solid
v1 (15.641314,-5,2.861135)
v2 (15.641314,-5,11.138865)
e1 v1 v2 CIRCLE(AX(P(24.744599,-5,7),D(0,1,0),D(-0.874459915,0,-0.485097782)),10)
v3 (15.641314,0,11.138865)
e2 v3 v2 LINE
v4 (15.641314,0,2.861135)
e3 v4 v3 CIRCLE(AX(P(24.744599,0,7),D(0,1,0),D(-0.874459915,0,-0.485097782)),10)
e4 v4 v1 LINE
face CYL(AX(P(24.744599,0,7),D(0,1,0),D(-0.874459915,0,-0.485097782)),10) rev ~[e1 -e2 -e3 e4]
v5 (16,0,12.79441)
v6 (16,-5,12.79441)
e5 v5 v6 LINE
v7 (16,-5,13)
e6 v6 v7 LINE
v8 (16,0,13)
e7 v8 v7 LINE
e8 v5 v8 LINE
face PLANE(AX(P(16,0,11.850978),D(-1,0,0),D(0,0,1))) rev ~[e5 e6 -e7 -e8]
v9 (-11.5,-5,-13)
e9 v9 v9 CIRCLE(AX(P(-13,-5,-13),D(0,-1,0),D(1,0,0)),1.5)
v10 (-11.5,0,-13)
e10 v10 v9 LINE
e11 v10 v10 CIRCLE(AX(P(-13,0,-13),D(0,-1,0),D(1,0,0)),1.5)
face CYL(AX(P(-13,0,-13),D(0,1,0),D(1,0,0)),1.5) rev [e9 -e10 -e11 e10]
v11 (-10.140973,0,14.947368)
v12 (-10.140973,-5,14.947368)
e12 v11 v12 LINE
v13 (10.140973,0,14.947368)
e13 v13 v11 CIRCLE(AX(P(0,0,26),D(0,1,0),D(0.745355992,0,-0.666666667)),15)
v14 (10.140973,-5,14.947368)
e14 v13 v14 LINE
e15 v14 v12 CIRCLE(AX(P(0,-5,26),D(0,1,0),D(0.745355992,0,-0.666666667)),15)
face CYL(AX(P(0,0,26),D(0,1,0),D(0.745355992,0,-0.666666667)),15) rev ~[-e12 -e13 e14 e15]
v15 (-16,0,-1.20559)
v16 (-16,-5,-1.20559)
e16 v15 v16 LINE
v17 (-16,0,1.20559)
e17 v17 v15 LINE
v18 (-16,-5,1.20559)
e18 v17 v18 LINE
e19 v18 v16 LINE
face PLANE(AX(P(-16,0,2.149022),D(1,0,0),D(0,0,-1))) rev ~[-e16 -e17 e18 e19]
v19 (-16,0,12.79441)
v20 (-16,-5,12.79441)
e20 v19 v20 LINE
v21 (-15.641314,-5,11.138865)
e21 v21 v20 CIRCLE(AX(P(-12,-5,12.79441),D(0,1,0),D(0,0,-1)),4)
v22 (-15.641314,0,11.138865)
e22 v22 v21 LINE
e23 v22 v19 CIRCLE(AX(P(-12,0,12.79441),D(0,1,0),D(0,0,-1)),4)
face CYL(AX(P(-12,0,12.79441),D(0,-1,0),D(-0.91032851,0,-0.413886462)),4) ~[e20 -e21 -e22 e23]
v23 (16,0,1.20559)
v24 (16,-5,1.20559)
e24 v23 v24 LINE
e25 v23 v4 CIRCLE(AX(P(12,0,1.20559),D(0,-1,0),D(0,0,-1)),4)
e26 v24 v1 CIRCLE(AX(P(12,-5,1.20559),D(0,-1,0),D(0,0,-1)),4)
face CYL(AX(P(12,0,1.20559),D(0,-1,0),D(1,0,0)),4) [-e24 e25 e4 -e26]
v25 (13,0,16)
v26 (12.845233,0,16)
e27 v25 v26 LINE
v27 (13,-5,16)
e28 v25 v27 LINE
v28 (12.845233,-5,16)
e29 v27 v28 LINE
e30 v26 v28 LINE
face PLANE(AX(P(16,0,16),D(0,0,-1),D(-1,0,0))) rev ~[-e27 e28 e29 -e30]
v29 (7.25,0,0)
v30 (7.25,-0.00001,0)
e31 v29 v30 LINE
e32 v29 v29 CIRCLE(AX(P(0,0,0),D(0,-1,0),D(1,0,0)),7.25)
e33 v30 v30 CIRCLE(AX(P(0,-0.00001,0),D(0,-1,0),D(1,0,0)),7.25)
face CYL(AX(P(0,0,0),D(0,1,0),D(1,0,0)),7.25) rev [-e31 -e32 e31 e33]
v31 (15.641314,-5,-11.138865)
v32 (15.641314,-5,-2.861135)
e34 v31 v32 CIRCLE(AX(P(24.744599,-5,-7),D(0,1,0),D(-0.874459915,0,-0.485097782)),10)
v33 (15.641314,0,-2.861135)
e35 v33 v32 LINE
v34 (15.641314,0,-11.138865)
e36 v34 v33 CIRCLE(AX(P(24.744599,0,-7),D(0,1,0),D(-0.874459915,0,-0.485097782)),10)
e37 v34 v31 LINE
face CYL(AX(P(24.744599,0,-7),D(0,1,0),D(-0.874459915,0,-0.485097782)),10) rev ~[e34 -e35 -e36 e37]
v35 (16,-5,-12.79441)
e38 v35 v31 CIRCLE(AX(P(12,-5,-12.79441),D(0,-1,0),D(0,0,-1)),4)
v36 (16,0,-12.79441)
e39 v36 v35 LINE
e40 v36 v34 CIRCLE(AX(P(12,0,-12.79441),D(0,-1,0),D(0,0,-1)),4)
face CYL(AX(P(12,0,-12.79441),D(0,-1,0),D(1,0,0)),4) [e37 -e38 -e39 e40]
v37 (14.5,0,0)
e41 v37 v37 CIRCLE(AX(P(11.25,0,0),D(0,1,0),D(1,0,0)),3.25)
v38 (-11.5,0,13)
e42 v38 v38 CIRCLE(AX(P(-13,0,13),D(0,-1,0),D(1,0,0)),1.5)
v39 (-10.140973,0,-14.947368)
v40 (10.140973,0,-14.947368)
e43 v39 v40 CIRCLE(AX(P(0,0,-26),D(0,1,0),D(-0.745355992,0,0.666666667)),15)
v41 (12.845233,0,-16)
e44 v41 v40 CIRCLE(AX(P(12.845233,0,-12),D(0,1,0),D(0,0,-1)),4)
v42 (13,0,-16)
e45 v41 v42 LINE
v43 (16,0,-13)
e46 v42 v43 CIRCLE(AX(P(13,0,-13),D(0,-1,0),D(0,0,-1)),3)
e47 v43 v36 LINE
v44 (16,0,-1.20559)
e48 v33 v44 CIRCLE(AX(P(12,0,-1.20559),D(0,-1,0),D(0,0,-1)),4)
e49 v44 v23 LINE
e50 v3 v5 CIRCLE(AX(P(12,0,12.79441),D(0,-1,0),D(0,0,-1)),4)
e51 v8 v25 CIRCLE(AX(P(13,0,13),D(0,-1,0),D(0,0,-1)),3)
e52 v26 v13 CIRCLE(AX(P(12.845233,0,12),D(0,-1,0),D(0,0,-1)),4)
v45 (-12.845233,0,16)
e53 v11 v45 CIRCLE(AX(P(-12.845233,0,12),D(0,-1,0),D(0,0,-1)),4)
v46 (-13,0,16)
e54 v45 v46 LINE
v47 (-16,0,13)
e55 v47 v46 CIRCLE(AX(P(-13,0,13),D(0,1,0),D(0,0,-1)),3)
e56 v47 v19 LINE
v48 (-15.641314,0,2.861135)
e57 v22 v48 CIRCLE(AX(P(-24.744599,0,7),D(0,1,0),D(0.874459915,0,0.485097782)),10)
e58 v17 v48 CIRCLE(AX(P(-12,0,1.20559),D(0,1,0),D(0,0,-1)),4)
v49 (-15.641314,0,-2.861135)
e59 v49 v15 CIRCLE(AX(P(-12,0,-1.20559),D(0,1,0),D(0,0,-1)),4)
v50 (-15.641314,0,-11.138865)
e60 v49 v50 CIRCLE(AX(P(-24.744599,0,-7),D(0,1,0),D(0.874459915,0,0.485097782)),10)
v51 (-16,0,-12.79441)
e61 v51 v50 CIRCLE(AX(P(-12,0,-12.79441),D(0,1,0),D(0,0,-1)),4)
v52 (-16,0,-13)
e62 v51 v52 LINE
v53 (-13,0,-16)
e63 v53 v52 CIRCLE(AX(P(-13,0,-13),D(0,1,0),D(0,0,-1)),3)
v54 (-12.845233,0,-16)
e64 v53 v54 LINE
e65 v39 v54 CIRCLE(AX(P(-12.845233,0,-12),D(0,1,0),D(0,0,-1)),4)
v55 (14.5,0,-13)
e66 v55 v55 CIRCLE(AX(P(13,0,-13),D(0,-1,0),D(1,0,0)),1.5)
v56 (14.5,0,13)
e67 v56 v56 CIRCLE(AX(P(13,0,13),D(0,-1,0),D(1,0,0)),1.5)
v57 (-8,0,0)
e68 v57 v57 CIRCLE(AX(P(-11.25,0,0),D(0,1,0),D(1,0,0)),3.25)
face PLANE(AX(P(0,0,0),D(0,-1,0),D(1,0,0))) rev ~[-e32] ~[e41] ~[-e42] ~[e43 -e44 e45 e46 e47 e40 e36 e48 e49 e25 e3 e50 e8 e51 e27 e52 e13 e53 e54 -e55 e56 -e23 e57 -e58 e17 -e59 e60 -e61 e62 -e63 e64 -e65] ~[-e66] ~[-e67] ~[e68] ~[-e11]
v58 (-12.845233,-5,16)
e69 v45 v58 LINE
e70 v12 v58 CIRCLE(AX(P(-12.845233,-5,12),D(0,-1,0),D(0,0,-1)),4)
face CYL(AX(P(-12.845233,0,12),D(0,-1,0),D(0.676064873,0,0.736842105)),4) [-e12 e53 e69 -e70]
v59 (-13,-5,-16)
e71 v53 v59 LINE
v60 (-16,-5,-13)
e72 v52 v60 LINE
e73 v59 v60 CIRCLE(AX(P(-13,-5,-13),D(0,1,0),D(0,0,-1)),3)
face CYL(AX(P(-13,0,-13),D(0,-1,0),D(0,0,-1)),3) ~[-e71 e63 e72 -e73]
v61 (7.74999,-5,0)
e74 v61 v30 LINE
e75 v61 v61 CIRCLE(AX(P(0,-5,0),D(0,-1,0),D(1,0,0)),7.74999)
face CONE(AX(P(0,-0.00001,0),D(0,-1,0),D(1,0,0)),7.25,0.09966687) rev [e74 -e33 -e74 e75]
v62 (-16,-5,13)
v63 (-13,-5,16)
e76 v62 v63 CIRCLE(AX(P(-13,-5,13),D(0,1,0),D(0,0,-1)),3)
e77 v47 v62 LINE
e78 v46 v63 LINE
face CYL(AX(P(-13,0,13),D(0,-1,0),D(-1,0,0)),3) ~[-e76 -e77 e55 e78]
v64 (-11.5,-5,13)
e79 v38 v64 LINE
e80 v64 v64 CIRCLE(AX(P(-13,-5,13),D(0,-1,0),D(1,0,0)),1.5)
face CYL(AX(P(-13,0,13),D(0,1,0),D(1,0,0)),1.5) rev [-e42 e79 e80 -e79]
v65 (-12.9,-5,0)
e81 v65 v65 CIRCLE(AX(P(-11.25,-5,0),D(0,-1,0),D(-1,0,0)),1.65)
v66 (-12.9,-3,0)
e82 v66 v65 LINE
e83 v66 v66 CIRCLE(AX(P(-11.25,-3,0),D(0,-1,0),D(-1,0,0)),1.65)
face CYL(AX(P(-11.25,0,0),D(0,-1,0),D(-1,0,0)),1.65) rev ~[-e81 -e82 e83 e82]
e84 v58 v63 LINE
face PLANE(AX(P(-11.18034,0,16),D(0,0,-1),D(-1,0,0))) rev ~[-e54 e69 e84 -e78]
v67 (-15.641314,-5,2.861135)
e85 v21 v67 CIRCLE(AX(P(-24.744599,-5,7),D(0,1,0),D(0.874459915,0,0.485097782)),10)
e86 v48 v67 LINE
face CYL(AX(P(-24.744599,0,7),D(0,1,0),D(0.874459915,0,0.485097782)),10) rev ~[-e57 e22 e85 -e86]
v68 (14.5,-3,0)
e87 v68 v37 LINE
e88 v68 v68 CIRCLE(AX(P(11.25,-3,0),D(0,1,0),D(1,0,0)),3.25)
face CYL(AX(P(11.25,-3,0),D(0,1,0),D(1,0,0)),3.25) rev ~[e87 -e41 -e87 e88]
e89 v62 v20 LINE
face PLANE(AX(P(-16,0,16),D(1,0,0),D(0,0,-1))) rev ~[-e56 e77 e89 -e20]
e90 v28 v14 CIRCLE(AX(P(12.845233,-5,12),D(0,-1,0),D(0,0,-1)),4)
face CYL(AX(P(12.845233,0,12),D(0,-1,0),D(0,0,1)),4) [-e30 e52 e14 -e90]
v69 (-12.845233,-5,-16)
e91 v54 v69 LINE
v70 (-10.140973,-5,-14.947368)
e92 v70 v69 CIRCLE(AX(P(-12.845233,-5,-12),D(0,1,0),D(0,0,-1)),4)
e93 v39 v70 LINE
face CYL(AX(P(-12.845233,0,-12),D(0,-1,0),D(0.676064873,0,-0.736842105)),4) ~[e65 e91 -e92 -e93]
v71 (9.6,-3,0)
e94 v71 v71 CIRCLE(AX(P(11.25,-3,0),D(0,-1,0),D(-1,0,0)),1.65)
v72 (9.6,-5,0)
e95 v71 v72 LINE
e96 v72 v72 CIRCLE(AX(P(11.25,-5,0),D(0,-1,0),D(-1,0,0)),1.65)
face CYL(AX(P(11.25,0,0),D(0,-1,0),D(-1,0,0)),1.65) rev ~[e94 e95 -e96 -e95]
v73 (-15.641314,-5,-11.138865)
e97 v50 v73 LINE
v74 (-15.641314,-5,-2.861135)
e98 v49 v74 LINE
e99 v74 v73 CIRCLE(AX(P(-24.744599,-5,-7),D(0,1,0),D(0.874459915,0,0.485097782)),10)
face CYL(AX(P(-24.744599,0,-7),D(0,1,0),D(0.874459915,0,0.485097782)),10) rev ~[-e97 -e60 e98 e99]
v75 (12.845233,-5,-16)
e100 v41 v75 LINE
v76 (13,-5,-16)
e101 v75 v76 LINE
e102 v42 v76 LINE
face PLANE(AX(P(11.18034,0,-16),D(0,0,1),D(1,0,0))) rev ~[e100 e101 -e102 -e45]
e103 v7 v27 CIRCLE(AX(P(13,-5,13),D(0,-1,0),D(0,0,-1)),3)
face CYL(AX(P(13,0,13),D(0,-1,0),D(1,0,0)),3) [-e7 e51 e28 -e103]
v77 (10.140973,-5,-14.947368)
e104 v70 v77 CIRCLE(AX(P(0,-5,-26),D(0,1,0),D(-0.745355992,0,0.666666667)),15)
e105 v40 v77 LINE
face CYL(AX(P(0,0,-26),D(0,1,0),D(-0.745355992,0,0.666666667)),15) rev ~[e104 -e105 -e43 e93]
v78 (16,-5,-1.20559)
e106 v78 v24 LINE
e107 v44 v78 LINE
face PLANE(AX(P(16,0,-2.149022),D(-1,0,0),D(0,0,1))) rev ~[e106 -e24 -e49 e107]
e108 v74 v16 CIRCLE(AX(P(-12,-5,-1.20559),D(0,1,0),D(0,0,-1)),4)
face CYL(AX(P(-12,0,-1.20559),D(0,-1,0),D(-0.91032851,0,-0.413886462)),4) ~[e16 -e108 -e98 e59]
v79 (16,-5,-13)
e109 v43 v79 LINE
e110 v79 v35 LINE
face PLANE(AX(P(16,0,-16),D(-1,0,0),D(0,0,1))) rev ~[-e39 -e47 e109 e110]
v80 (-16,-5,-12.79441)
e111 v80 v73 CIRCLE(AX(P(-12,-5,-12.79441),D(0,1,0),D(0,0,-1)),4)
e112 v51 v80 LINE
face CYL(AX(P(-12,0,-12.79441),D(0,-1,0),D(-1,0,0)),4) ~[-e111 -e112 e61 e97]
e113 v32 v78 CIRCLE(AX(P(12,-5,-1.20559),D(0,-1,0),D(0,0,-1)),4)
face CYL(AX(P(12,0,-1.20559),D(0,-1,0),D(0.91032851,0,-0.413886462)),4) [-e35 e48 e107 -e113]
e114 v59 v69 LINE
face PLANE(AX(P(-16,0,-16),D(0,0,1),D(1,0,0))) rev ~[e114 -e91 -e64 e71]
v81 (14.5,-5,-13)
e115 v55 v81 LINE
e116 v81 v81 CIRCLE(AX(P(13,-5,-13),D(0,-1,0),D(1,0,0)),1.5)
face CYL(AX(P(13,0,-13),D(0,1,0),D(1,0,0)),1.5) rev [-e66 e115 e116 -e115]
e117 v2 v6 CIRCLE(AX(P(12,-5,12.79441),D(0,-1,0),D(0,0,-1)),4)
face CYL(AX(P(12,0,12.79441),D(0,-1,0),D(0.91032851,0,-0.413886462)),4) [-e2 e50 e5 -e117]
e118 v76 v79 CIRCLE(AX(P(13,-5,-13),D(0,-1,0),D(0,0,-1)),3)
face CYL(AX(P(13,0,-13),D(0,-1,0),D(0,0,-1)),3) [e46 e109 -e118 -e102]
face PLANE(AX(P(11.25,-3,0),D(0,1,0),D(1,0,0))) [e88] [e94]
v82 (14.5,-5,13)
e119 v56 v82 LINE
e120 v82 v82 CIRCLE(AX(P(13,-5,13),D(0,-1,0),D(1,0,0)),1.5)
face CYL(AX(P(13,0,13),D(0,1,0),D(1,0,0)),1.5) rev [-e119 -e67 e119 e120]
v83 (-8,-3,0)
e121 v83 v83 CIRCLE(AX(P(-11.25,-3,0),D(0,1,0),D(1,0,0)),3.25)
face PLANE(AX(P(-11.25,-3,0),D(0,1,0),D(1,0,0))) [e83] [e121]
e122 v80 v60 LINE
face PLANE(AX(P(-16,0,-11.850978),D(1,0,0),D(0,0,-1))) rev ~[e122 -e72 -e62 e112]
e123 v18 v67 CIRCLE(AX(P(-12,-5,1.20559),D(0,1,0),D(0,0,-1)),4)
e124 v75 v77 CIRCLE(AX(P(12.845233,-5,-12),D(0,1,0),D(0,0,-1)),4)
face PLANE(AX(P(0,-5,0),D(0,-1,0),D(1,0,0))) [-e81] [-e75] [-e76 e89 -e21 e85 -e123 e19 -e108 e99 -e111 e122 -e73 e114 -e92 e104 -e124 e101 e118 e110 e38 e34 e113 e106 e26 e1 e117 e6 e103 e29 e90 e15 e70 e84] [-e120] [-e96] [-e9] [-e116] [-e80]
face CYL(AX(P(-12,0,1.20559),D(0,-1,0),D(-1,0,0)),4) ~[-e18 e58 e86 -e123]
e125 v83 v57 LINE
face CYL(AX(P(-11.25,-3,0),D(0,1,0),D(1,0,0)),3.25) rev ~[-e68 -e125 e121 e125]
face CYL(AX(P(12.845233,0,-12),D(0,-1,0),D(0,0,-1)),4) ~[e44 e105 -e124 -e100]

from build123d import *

# Parameters (mm, degrees)
F0_R           = 1.5
F0_R_2         = 7.25
F1_DEPTH       = 5
F2_R           = 3
F3_SIZE2       = 4.99999
F3_SIZE        = 0.49999
F4_D           = 3.3
F4_CBORE_D     = 6.5
F4_CBORE_DEPTH = 3
F5_R           = 4


# Not quite as in the source:
# - a fillet or chamfer is up to 0.001 mm smaller than in the source, because OpenCascade refuses the exact size


with BuildPart() as f1:
    # F0 (on Front) → F1 (new body)
    with BuildSketch(Plane.XZ):
        with BuildLine():
            Line((11.1803398875, -16), (16, -16))
            Line((16, -16), (16, -11.8509778157))
            ThreePointArc((16, -11.8509778157), (14.7445991464, -7), (16, -2.1490221843))
            Line((16, -2.1490221843), (16, 2.1490221843))
            ThreePointArc((16, 2.1490221843), (14.7445991464, 7), (16, 11.8509778157))
            Line((16, 11.8509778157), (16, 16))
            Line((16, 16), (11.1803398875, 16))
            ThreePointArc((11.1803398875, 16), (0, 11), (-11.1803398875, 16))
            Line((-11.1803398875, 16), (-16, 16))
            Line((-16, 16), (-16, 11.8509778157))
            ThreePointArc((-16, 11.8509778157), (-14.7445991464, 7), (-16, 2.1490221843))
            Line((-16, 2.1490221843), (-16, -2.1490221843))
            ThreePointArc((-16, -2.1490221843), (-14.7445991464, -7), (-16, -11.8509778157))
            Line((-16, -11.8509778157), (-16, -16))
            Line((-16, -16), (-11.1803398875, -16))
            ThreePointArc((-11.1803398875, -16), (0, -11), (11.1803398875, -16))
        make_face()
        with Locations((-13, -13)):
            Circle(F0_R, mode=Mode.SUBTRACT)
        with Locations((13, -13)):
            Circle(F0_R, mode=Mode.SUBTRACT)
        with Locations((-13, 13)):
            Circle(F0_R, mode=Mode.SUBTRACT)
        Circle(F0_R_2, mode=Mode.SUBTRACT)
        with Locations((13, 13)):
            Circle(F0_R, mode=Mode.SUBTRACT)
    extrude(amount=F1_DEPTH)

    # F2
    f2_edges = [f1.edges().sort_by_distance(p)[0] for p in [
        (-16, -2.5, 16),
        (16, -2.5, 16),
        (16, -2.5, -16),
        (-16, -2.5, -16),
    ]]
    fillet(f2_edges, radius=F2_R)

    # F3 (size 0.5 and 5 in the source; OpenCascade refuses exactly that, so slightly less here)
    f3_edges = [f1.edges().sort_by_distance(p)[0] for p in [
        (-7.25, -5, 0),
    ]]
    f3_side = f1.faces().sort_by_distance((-15.547452, -5, -12.425489))[0]
    chamfer(f3_edges, length=F3_SIZE, length2=F3_SIZE2, reference=f3_side)

    # F4 (through all)
    with Locations(Plane(origin=(0, 0, 0), x_dir=(1, 0, 0), z_dir=(0, 1, 0))):
        with Locations((11.25, 0), (-11.25, 0)):
            CounterBoreHole(F4_D / 2, F4_CBORE_D / 2, F4_CBORE_DEPTH)

    # F5
    f5_edges = [f1.edges().sort_by_distance(p)[0] for p in [
        (-16, -2.5, -2.149022),
        (-16, -2.5, 2.149022),
        (-16, -2.5, 13),
        (11.18034, -2.5, 16),
        (16, -2.5, 2.149022),
        (16, -2.5, -2.149022),
        (11.18034, -2.5, -16),
        (-16, -2.5, -11.850978),
        (-11.18034, -2.5, -16),
        (-16, -2.5, 11.850978),
        (16, -2.5, -11.850978),
        (-11.18034, -2.5, 16),
        (16, -2.5, 11.850978),
    ]]
    fillet(f5_edges, radius=F5_R)


solid = f1.part
